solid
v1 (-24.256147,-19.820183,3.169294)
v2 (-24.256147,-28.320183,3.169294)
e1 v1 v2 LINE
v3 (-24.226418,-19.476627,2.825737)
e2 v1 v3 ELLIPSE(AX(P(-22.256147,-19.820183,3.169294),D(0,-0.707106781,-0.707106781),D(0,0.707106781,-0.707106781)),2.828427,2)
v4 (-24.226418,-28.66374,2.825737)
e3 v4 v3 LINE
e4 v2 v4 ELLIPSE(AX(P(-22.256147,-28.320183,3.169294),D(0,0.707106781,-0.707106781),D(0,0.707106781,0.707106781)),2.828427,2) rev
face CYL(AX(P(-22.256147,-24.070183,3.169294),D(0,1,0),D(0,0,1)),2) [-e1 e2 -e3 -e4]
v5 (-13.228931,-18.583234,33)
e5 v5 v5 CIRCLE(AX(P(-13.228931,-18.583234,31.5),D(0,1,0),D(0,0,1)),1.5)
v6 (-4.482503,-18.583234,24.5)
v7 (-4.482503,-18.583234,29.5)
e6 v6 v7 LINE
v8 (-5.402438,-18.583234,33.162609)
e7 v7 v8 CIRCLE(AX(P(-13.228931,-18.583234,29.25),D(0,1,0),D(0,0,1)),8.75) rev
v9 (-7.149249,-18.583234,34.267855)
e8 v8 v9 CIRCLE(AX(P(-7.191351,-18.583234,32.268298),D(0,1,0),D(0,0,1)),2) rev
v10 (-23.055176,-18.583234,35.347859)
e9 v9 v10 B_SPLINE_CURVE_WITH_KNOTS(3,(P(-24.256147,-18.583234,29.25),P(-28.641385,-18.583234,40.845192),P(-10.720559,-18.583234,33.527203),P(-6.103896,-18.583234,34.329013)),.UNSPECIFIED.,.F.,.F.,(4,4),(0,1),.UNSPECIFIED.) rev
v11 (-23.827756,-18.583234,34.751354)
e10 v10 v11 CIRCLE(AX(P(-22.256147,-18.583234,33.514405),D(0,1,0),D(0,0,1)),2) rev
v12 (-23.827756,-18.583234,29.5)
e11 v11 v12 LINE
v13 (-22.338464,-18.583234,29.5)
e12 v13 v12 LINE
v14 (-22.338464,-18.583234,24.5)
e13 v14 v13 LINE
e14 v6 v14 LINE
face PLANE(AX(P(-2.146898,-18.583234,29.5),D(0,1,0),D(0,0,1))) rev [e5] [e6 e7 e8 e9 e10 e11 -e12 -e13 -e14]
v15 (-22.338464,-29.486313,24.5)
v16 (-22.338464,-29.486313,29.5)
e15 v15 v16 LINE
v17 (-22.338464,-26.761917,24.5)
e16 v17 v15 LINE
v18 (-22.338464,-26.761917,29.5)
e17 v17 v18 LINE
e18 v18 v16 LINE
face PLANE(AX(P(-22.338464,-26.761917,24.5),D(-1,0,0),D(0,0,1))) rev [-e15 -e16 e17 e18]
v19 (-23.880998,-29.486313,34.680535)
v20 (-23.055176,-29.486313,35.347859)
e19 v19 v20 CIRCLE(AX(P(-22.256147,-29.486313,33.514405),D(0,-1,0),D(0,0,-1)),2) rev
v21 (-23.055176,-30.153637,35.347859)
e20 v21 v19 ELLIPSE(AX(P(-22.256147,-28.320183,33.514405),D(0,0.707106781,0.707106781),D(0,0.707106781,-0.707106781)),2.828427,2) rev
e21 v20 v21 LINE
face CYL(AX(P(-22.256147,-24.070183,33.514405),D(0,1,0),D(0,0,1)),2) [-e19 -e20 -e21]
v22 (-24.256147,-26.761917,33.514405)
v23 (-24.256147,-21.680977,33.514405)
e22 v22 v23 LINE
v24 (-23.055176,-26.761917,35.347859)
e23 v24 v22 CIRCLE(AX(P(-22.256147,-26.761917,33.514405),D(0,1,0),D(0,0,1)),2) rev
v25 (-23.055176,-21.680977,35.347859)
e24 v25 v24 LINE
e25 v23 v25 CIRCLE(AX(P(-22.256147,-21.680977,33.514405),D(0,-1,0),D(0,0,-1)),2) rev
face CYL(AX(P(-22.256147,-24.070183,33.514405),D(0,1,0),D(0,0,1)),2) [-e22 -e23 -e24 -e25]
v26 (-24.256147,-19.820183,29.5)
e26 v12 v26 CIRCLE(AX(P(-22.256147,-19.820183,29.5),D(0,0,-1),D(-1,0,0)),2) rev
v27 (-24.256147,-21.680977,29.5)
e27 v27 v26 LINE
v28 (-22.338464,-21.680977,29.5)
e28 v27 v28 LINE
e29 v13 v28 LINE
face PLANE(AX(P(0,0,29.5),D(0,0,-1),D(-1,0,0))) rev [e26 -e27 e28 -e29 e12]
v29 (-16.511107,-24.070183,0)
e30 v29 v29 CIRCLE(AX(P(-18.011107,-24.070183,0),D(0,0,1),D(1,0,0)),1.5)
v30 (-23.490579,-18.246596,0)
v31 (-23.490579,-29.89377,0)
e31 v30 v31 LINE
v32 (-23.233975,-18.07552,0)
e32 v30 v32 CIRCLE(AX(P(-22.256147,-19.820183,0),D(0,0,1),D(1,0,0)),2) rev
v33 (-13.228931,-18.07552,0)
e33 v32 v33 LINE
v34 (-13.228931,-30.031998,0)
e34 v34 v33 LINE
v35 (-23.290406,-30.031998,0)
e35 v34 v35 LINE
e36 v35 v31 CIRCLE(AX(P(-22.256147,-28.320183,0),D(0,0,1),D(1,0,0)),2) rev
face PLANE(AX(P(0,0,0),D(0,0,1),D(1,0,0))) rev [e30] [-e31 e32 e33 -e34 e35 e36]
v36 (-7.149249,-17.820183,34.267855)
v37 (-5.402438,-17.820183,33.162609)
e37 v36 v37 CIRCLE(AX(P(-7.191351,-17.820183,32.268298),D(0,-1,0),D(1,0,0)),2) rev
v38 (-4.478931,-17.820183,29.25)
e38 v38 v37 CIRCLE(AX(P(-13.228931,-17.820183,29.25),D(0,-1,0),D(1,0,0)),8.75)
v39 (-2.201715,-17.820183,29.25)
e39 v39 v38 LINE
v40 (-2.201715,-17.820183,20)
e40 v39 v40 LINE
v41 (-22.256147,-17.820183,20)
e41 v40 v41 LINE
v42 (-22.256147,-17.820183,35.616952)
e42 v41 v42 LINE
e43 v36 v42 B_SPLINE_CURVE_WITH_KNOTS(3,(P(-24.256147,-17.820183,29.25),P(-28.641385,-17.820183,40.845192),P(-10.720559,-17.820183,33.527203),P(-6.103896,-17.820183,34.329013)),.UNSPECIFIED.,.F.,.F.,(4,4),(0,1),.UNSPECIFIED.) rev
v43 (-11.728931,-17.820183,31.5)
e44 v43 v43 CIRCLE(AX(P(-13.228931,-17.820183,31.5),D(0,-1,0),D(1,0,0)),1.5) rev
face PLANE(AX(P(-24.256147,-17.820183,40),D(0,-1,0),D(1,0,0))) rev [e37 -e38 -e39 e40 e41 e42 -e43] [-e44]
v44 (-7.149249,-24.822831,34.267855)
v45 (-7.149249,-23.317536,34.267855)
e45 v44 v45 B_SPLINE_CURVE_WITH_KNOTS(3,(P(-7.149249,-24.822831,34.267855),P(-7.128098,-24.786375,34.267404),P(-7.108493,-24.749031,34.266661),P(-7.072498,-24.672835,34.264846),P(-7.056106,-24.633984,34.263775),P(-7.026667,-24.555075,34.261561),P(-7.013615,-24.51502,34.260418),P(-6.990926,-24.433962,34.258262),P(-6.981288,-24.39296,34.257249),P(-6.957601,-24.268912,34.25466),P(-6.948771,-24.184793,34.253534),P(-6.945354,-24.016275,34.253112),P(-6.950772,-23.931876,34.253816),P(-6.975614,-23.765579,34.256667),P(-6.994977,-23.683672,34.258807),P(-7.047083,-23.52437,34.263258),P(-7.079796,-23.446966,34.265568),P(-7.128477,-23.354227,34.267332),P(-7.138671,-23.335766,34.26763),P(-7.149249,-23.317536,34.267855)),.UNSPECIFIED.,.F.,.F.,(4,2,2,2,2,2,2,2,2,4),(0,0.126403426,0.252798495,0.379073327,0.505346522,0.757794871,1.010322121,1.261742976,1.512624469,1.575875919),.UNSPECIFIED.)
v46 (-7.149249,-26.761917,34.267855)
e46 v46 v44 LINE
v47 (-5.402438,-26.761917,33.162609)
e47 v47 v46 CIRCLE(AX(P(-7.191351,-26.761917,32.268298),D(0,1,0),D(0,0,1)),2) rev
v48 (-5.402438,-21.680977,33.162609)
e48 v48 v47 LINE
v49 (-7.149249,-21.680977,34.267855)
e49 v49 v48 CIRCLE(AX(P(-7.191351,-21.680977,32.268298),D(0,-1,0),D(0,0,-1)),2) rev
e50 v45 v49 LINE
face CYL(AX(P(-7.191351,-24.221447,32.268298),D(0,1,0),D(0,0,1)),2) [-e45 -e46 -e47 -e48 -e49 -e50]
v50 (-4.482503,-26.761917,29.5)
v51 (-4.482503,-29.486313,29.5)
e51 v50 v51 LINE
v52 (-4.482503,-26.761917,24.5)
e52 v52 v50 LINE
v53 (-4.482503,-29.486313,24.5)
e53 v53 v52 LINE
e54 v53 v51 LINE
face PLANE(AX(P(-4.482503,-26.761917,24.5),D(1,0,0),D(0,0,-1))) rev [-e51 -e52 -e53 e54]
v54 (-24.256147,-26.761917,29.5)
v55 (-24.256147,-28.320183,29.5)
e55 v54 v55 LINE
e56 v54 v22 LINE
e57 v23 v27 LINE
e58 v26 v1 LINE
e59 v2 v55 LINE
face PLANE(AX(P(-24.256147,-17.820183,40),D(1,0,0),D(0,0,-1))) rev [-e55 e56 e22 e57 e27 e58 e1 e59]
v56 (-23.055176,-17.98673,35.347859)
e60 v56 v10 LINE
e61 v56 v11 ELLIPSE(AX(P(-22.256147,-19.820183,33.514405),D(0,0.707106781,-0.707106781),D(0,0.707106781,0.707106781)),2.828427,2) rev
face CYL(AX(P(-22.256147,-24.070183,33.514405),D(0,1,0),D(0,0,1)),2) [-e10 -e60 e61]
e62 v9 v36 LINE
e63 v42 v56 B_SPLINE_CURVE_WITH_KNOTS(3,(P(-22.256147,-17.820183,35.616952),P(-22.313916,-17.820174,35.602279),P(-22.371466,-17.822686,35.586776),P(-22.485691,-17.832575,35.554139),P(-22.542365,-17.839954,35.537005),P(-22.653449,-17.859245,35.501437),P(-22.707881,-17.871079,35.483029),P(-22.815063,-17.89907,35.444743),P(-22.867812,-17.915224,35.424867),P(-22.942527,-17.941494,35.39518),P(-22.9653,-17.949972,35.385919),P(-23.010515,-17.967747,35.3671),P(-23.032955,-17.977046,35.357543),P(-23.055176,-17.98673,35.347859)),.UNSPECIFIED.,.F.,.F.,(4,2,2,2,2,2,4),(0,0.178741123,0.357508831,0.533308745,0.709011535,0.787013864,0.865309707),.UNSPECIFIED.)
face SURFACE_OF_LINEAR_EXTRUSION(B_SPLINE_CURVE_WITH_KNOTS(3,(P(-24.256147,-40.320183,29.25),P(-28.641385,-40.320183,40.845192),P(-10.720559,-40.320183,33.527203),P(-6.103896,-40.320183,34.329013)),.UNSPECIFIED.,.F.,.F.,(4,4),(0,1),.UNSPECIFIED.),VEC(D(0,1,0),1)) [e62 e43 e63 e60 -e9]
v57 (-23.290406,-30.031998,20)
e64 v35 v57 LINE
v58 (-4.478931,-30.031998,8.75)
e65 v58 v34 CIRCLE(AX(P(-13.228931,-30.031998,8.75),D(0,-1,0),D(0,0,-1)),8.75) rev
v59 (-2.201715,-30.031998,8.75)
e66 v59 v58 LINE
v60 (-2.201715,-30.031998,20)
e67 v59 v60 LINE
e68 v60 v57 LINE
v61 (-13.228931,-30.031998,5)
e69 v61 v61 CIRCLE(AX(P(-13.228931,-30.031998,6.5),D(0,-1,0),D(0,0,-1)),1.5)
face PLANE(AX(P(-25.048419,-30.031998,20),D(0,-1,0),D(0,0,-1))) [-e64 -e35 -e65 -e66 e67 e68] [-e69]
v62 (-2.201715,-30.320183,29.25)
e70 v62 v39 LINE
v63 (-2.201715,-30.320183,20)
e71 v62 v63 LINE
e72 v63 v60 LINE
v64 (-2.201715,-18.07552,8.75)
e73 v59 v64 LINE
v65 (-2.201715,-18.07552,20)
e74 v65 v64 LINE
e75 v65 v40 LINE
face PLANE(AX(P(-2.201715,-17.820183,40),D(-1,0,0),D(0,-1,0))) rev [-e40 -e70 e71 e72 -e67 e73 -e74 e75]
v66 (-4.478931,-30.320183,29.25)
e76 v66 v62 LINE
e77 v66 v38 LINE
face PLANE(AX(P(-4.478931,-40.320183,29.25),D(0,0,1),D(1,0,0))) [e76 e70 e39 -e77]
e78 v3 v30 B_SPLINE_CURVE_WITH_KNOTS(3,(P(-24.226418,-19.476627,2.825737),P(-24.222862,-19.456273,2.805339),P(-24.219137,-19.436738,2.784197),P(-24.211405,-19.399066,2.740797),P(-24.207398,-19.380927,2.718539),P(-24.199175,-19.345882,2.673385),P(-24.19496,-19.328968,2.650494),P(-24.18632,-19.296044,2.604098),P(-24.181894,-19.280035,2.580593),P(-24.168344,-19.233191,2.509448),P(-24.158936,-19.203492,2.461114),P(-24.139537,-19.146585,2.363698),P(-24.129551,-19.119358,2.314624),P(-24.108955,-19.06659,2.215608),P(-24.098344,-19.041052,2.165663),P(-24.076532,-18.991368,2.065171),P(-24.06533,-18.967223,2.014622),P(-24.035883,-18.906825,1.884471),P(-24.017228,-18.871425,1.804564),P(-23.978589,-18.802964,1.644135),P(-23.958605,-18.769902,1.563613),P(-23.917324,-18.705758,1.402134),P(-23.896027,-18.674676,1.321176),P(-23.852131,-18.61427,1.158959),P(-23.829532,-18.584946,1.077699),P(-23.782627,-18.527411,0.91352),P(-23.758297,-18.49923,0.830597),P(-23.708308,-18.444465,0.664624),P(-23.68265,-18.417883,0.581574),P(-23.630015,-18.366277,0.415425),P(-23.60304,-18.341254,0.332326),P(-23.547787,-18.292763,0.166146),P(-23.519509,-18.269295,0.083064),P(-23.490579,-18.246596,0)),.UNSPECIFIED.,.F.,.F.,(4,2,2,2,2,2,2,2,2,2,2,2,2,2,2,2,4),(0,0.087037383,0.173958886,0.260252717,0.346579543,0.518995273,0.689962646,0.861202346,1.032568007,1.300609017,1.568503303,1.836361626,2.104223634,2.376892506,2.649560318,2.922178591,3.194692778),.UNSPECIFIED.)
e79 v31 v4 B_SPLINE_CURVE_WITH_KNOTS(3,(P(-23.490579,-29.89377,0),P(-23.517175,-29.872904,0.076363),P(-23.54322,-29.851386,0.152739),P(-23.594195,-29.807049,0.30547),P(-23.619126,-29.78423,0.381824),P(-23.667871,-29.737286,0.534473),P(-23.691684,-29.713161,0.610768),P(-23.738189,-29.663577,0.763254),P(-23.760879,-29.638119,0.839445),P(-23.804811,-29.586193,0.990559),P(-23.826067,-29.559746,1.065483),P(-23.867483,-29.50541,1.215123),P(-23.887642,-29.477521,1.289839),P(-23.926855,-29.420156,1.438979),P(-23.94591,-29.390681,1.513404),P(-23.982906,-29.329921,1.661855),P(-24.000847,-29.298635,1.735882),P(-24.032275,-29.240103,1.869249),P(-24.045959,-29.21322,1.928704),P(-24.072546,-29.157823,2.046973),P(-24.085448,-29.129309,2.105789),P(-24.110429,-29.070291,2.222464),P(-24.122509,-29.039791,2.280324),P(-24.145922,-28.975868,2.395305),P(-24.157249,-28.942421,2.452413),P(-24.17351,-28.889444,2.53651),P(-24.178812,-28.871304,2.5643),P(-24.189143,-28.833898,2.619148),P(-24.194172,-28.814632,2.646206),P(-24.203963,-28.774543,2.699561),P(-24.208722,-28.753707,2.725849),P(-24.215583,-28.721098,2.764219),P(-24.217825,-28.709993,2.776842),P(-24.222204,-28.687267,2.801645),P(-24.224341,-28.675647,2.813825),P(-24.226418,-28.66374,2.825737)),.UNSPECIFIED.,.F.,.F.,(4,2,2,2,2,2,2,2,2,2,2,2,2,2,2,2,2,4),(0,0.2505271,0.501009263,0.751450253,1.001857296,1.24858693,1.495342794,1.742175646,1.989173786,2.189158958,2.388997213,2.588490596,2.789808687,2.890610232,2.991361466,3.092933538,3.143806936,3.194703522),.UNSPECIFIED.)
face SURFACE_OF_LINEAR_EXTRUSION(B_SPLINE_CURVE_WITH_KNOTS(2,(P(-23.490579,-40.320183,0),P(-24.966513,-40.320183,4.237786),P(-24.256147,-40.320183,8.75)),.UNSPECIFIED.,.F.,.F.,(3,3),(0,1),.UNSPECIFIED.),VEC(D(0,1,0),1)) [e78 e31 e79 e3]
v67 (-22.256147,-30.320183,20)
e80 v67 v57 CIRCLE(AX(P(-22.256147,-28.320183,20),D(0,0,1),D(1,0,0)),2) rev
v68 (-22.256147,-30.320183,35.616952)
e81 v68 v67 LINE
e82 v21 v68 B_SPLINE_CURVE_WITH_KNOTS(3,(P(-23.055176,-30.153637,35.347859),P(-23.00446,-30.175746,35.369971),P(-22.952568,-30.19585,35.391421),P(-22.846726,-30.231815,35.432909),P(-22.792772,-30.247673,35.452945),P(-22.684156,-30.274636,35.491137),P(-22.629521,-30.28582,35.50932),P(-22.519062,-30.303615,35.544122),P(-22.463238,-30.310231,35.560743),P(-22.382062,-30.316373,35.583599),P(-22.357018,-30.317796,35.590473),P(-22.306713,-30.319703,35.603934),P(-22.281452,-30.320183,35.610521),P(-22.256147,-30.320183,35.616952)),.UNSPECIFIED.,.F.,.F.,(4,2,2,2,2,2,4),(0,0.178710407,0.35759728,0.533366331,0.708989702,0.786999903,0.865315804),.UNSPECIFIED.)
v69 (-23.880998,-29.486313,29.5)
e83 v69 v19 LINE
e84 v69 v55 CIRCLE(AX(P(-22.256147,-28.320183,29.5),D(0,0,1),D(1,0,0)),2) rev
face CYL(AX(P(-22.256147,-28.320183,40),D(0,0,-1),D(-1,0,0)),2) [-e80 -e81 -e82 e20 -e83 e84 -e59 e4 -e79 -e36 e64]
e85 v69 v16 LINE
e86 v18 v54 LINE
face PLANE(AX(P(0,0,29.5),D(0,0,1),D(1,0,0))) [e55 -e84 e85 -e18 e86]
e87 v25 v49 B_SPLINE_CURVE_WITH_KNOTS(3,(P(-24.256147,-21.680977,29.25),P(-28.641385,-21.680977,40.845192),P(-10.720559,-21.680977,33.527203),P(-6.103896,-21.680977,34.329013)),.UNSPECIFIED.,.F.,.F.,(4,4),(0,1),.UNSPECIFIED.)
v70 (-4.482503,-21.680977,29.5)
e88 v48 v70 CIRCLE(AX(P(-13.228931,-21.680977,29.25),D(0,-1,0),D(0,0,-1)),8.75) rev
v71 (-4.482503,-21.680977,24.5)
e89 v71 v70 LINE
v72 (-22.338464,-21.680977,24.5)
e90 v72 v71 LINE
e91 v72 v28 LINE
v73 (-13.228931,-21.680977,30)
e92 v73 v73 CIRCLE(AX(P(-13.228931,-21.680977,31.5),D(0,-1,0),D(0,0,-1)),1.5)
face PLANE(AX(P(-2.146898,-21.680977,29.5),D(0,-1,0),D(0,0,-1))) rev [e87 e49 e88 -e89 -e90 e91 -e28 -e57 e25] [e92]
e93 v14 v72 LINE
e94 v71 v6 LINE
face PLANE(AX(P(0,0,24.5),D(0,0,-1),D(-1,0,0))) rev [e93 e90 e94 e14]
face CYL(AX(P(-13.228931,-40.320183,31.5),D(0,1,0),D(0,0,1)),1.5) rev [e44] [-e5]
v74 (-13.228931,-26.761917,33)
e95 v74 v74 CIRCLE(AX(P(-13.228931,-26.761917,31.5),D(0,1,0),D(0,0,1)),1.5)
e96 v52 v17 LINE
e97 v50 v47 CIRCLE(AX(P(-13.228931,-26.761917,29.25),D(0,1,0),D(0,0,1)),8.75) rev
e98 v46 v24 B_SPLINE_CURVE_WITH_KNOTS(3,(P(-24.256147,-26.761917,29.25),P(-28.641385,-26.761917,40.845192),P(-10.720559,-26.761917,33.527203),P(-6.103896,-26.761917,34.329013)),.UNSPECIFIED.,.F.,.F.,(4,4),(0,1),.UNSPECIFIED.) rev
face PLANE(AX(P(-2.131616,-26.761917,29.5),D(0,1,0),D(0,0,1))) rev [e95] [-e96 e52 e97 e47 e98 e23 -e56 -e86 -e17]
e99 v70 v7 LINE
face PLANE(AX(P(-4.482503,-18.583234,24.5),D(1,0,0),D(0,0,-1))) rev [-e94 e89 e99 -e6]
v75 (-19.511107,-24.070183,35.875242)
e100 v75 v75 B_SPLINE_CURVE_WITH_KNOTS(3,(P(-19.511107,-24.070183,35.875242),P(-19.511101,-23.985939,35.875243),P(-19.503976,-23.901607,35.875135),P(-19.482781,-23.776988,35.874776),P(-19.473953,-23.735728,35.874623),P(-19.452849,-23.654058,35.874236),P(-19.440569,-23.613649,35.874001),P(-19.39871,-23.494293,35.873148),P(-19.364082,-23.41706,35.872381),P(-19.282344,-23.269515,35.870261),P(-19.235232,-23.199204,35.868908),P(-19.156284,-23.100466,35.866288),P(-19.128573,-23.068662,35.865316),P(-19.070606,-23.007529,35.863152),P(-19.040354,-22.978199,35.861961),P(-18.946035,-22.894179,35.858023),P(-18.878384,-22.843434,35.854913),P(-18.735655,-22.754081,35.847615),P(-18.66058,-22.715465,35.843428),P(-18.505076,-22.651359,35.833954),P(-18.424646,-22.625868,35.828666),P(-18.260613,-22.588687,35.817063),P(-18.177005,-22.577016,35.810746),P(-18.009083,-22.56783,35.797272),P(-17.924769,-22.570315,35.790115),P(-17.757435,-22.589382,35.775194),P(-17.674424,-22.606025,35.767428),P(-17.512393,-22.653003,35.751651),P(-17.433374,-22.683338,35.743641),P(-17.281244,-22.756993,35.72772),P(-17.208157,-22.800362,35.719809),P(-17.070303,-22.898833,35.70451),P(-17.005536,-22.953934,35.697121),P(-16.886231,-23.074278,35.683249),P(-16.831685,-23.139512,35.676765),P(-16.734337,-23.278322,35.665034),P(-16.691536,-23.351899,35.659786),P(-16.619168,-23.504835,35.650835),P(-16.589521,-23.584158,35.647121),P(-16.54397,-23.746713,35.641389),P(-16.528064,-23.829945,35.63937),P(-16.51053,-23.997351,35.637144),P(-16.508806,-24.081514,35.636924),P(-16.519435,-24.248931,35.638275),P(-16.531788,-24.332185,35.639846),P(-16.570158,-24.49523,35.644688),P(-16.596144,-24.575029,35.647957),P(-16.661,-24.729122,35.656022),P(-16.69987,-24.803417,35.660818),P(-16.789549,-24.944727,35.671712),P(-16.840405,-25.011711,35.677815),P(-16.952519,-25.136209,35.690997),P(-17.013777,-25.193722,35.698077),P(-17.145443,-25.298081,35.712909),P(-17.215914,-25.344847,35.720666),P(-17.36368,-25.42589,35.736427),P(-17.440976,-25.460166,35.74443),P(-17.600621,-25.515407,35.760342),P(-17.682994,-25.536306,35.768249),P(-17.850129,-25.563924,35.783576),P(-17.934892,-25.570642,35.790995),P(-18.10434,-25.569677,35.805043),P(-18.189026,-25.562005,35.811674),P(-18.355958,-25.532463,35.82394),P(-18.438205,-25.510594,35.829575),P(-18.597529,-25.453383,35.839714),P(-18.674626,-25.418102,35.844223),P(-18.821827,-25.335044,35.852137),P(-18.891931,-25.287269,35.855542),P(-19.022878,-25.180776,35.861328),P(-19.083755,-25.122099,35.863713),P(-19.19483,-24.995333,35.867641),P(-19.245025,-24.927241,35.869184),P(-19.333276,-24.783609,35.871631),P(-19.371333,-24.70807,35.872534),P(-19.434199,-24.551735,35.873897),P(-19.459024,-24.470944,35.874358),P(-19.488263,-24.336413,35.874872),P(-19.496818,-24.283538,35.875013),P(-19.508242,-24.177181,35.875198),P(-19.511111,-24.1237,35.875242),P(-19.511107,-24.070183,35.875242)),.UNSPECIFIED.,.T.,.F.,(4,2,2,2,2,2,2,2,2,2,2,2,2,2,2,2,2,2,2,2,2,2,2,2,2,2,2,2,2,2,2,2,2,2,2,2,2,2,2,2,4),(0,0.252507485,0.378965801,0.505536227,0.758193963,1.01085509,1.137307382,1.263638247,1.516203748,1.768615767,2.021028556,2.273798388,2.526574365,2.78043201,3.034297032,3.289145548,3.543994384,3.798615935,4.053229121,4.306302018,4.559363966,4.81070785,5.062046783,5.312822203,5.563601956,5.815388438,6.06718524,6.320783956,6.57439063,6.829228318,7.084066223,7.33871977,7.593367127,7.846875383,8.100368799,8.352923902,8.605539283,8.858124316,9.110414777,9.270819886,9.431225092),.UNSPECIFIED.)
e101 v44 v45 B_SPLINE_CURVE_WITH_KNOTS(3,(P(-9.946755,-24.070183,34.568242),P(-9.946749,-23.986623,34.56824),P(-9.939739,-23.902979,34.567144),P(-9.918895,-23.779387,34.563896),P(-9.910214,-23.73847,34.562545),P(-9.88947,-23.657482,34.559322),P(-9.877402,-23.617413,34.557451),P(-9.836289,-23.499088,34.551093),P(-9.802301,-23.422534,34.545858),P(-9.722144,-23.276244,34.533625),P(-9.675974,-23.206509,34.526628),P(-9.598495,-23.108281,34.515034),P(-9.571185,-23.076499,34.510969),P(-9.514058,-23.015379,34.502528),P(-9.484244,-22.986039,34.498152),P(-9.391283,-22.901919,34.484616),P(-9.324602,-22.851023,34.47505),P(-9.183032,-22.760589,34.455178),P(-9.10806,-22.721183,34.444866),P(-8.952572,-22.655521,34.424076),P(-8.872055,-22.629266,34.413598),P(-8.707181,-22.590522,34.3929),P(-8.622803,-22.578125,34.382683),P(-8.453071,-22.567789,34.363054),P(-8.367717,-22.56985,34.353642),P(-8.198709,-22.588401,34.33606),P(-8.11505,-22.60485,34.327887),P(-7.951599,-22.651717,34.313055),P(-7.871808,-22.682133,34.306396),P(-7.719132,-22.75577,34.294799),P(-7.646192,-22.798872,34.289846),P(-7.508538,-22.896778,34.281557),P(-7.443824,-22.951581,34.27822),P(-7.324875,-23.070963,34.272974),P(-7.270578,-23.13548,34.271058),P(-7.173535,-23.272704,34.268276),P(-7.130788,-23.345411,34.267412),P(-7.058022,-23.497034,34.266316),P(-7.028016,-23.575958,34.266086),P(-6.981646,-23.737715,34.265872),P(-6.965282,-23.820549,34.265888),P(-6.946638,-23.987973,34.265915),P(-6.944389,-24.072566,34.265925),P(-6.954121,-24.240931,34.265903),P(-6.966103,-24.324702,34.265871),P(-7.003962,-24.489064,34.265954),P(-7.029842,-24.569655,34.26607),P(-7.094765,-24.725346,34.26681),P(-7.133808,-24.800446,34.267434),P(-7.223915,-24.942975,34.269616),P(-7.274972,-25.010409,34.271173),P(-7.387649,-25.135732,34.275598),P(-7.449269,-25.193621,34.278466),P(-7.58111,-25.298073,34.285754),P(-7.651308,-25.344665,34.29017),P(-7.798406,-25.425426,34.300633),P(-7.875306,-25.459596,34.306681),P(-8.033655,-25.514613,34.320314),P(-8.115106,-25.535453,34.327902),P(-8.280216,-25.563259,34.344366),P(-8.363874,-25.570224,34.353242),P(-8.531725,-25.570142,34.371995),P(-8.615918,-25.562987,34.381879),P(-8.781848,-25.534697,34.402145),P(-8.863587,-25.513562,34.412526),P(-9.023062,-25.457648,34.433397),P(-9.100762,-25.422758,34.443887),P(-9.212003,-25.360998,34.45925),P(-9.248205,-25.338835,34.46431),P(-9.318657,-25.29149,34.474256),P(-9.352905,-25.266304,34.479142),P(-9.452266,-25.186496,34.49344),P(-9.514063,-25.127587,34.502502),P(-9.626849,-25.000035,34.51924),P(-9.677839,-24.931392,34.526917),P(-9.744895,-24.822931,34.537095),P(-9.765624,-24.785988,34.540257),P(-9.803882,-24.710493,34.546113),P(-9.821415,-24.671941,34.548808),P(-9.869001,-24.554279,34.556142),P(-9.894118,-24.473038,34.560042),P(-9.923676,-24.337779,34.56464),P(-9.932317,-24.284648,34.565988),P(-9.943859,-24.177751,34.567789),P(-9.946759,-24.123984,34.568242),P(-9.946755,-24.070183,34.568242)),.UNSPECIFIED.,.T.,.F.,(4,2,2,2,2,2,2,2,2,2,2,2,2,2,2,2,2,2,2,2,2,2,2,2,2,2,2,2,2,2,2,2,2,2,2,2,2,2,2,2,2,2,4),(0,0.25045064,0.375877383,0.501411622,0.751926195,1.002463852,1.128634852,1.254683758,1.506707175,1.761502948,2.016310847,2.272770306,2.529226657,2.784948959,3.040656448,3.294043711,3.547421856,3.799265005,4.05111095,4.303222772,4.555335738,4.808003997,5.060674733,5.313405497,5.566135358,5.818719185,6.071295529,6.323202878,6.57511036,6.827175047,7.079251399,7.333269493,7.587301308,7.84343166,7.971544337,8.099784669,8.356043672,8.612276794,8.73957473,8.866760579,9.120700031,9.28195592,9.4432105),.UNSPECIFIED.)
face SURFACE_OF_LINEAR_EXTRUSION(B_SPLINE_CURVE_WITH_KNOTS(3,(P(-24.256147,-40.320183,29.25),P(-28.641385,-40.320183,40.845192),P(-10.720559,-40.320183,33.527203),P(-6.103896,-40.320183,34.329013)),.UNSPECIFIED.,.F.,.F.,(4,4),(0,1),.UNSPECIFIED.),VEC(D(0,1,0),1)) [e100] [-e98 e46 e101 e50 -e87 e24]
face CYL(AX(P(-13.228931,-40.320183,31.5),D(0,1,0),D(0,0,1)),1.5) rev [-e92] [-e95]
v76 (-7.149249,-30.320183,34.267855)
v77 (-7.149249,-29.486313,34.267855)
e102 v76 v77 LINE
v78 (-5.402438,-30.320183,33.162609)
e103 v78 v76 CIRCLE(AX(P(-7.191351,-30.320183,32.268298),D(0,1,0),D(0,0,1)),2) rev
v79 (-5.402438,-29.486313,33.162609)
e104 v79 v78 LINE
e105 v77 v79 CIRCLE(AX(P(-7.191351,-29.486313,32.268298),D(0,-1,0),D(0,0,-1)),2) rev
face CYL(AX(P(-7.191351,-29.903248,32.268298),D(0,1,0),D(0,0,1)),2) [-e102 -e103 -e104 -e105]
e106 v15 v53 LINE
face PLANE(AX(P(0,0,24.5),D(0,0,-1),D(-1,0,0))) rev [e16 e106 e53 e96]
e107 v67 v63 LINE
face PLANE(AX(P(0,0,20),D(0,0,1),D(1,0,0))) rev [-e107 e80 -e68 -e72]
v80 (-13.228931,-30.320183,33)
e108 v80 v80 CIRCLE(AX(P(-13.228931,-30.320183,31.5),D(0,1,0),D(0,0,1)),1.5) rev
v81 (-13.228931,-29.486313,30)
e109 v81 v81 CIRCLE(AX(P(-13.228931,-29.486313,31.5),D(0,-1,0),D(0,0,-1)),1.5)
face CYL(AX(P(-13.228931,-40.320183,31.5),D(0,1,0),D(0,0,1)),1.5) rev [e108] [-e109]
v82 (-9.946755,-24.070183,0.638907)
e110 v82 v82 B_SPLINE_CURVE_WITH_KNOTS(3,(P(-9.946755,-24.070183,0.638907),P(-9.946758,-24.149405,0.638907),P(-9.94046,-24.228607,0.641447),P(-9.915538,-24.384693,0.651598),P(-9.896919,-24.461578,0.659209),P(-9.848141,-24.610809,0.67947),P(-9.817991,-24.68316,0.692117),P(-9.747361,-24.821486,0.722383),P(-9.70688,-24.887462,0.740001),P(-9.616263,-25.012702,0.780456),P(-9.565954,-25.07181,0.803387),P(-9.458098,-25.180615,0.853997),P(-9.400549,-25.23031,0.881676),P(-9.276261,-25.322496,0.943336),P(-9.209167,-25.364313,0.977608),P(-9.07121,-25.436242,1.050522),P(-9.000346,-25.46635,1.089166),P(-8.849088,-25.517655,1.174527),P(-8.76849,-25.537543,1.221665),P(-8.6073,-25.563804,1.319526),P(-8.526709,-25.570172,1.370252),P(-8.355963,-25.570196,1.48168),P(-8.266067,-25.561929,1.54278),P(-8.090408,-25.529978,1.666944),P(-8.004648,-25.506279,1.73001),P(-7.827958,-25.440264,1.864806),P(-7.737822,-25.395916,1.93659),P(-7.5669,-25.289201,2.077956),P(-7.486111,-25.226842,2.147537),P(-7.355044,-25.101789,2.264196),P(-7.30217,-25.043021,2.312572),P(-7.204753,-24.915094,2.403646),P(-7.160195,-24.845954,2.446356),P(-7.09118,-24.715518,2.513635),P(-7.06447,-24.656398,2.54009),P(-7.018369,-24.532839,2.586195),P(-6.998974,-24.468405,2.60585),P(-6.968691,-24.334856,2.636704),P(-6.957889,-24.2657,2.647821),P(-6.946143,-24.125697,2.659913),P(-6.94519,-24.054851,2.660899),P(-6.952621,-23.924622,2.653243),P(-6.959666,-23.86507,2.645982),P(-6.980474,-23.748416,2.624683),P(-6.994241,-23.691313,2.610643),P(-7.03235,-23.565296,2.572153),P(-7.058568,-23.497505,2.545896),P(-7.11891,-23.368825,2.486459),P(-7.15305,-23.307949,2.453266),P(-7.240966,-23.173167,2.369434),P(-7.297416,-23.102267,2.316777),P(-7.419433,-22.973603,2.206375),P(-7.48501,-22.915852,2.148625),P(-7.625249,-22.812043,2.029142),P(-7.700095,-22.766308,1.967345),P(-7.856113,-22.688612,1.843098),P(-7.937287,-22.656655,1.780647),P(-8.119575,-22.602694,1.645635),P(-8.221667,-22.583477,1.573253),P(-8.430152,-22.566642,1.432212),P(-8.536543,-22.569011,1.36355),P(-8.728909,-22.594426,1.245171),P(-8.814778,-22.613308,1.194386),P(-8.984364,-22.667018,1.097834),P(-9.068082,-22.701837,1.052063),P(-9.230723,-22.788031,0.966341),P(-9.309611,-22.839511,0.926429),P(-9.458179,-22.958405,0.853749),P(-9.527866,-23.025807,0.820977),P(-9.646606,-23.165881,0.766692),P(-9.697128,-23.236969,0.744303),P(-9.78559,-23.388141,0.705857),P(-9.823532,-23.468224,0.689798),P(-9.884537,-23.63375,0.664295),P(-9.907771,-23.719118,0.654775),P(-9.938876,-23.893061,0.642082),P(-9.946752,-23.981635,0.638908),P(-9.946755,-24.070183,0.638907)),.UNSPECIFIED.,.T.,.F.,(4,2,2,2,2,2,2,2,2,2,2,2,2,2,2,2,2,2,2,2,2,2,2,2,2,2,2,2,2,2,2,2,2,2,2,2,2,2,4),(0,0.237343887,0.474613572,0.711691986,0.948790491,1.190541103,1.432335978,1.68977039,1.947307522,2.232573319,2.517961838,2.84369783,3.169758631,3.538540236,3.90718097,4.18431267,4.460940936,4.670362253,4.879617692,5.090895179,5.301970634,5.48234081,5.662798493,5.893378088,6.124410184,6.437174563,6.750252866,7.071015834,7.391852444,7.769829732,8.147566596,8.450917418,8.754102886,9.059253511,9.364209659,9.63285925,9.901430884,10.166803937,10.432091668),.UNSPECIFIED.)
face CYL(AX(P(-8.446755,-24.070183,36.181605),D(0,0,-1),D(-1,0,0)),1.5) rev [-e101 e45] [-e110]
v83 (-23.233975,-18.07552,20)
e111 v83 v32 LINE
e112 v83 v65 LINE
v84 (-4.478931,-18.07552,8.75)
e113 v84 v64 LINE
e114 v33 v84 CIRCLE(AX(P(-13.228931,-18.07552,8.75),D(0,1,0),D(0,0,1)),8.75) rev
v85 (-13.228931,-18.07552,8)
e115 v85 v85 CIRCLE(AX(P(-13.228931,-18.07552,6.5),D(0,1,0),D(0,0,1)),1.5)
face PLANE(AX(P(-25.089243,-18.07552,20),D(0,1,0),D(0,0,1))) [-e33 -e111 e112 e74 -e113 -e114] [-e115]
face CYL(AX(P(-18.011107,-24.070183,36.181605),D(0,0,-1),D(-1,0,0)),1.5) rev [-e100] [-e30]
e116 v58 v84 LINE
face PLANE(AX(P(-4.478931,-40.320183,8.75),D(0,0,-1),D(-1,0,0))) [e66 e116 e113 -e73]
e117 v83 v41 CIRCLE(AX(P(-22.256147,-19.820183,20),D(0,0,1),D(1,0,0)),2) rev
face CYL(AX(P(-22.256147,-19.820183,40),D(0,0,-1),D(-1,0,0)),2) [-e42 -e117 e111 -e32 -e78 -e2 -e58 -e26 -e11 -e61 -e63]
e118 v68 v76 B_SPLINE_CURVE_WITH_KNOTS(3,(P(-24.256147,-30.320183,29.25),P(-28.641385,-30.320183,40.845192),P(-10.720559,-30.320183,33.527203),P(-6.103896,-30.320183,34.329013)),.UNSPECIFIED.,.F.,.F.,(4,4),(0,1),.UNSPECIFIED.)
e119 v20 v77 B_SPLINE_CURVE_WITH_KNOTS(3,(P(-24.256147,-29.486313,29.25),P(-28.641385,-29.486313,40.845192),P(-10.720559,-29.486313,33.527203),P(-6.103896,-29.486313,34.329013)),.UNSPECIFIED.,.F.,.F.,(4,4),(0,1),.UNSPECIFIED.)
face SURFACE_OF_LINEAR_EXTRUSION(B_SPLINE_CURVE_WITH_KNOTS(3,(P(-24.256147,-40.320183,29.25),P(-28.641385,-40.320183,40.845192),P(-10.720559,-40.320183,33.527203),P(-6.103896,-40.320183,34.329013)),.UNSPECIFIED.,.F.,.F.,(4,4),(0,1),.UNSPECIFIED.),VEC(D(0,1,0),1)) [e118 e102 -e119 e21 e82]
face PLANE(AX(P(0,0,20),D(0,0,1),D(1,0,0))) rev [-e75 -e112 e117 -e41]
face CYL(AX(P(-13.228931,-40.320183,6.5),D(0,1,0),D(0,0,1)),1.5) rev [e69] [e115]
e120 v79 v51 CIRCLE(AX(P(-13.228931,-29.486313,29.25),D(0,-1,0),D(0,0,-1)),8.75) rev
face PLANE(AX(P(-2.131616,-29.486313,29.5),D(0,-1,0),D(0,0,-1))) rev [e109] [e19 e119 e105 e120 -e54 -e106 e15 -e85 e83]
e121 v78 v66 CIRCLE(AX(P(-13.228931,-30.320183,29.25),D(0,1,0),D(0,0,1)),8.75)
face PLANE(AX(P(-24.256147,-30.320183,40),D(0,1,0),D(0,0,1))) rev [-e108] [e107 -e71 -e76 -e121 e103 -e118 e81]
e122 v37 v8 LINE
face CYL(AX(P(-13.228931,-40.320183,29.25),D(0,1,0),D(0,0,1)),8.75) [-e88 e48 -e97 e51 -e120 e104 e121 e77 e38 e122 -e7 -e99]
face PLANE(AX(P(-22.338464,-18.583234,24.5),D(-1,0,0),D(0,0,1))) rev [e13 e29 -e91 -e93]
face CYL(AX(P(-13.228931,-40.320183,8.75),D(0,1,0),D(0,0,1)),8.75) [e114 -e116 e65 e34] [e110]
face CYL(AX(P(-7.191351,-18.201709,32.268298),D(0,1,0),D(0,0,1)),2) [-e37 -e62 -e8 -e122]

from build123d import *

# Parameters (mm, degrees)
SKETCH1_W               = 22.054431489
SKETCH1_H               = 12.5
BOSS_EXTRUDE1_DEPTH     = 40
CUT_EXTRUDE1_DEPTH      = 10
CUT_EXTRUDE1_DEPTH_BACK = 15
SKETCH2_R               = 1.5
FILLET3_R               = 2
SKETCH5_R               = 1.5
CUT_EXTRUDE4_DEPTH      = 53.86644408
SKETCH16_W              = 22.16406654
SKETCH16_H              = 3.097743049
SKETCH16_W_2            = 22.194630718
SKETCH16_H_2            = 2.724396189
CUT_EXTRUDE6_DEPTH      = 8.5
FILLET4_R               = 2
SKETCH17_W              = 17.85596127
SKETCH17_H              = 3.097743049
SKETCH17_H_2            = 2.724396189
CUT_EXTRUDE7_DEPTH      = 5
SKETCH18_W              = 23.758682738
SKETCH18_H              = 0.759330362
SKETCH18_W_2            = 23.717859304
SKETCH18_H_2            = 0.728261761
CUT_EXTRUDE8_DEPTH      = 20


with BuildPart() as part:
    # Sketch1 → Boss-Extrude1 (new body)
    with BuildSketch(Plane.XY):
        with Locations((-13.228930986, -24.070183414)):
            Rectangle(SKETCH1_W, SKETCH1_H)
    extrude(amount=BOSS_EXTRUDE1_DEPTH)

    # Sketch2 → Cut-Extrude1 (cut, two sides: drawn at the far end of the back side and taken through both)
    with BuildSketch(Plane.XZ.offset(30.320183414).offset(-CUT_EXTRUDE1_DEPTH_BACK)):
        with Locations(Location((-13.228930986, 6.5, 0), (0, 0, 90))):
            Circle(SKETCH2_R)
        with Locations(Location((-13.228930986, 31.5, 0), (0, 0, 90))):
            Circle(SKETCH2_R)
        with BuildLine():
            Line((-4.478930986, 29.25), (-2.201715242, 29.25))
            add(Edge.make_bspline(
                [(-24.256146731, 29.25), (-34.277912729, 38.417119108), (-13.227499763, 50.308047167), (7.840407292, 38.416977249), (-2.201715242, 29.25)],
                knots=[0, 0, 0, 0, 0.49986218, 1, 1, 1, 1], degree=3))
            add(Edge.make_bspline(
                [(-6.103895584, 34.329012749), (-10.720559386, 33.527203043), (-28.641384523, 40.845191705), (-24.256146731, 29.25)],
                knots=[0, 0, 0, 0, 1, 1, 1, 1], degree=3))
            ThreePointArc((-6.103895584, 34.329012749), (-4.895067543, 31.916312081), (-4.478930986, 29.25))
        make_face()
        with BuildLine():
            Line((-4.478930986, 8.75), (-2.201715242, 8.75))
            add(Edge.make_bspline(
                [(-2.201715242, 8.75), (5.39210746, 3.880294823), (-0.777052631, -4.523329032), (-17.174300591, -10.623347238), (-34.821400648, -0.026005424), (-24.256146731, 8.75)],
                knots=[0, 0, 0, 0, 0.283272691, 0.504244858, 1, 1, 1, 1], degree=3))
            add(Edge.make_bspline(
                [(-23.490579314, 0), (-24.966512963, 4.237786421), (-24.256146731, 8.75)],
                knots=[0, 0, 0, 1, 1, 1], degree=2))
            Line((-23.490579314, 0), (-13.228930986, 0))
            ThreePointArc((-13.228930986, 0), (-7.041746651, 2.562815665), (-4.478930986, 8.75))
        make_face()
    extrude(amount=CUT_EXTRUDE1_DEPTH + CUT_EXTRUDE1_DEPTH_BACK, mode=Mode.SUBTRACT)

    # Fillet3
    # the kernel refuses this fillet: 2 mm, written as the material it takes off along each edge
    with BuildSketch(Plane(origin=(-24.256146731, -17.820183414, -5.498495188), x_dir=(1, 0, 0), z_dir=(0, 0, 1))) as fillet3_piece_1:
        with BuildLine():
            CenterArc((FILLET3_R, -FILLET3_R), FILLET3_R, 90, 90)
            Line((0, -FILLET3_R), (-FILLET3_R * 0.02, -FILLET3_R))
            Line((-FILLET3_R * 0.02, -FILLET3_R), (-FILLET3_R * 0.02, FILLET3_R * 0.02))
            Line((-FILLET3_R * 0.02, FILLET3_R * 0.02), (FILLET3_R, FILLET3_R * 0.02))
            Line((FILLET3_R, FILLET3_R * 0.02), (FILLET3_R, 0))
        make_face()
    extrude(amount=44.984872581, mode=Mode.SUBTRACT)
    with BuildSketch(Plane(origin=(-24.256146731, -30.320183414, -5.498495188), x_dir=(1, 0, 0), z_dir=(0, 0, 1))) as fillet3_piece_2:
        with BuildLine():
            CenterArc((FILLET3_R, FILLET3_R), FILLET3_R, 180, 90)
            Line((0, FILLET3_R), (-FILLET3_R * 0.02, FILLET3_R))
            Line((-FILLET3_R * 0.02, FILLET3_R), (-FILLET3_R * 0.02, -FILLET3_R * 0.02))
            Line((-FILLET3_R * 0.02, -FILLET3_R * 0.02), (FILLET3_R, -FILLET3_R * 0.02))
            Line((FILLET3_R, -FILLET3_R * 0.02), (FILLET3_R, 0))
        make_face()
    extrude(amount=44.984872581, mode=Mode.SUBTRACT)
    with BuildSketch(Plane(origin=(-24.256146731, -17.374523396, 3.001504812), x_dir=(0.16676818592575848, -1.2260366807919533e-15, -0.9859961319209278), z_dir=(0, -1, 0))) as fillet3_piece_3:
        with BuildLine():
            CenterArc((0.168096911, 1.999974157), FILLET3_R, 260.400032587, 9.891234523)
            Line((-0.165439461, 0.027981894), (-0.172110188, -0.011457952))
            Line((-0.172110188, -0.011457952), (-0.006670727, -0.039439845))
            Line((-0.006670727, -0.039439845), (-0.00020343, -0.039999483))
            ThreePointArc((-0.00020343, -0.039999483), (0.089132026, -0.040226606), (0.178467349, -0.039999483))
            Line((0.178467349, -0.039999483), (0.178264007, 0))
        make_face()
    extrude(amount=13.391320036, mode=Mode.SUBTRACT)
    with BuildSketch(Plane(origin=(-24.256146731, -14.125185169, 34.486377393), x_dir=(0.8125654725304995, 0, 0.5828699279009736), z_dir=(0, -1, 0))) as fillet3_piece_4:
        with BuildLine():
            CenterArc((1.058597408, -1.955531144), FILLET3_R, 77.895172565, 66.452175148)
            Line((-0.566533537, -0.789791288), (-0.599036156, -0.766476491))
            Line((-0.599036156, -0.766476491), (-0.032502619, 0.023314797))
            Line((-0.032502619, 0.023314797), (-0.009827922, 0.038773856))
            ThreePointArc((-0.009827922, 0.038773856), (0.740246051, 0.125750941), (1.486387336, 0.039110623))
            Line((1.486387336, 0.039110623), (1.477999298, 0))
        make_face()
    extrude(amount=19.88999649, mode=Mode.SUBTRACT)

    # Sketch5 → Cut-Extrude4 (cut, through all)
    with BuildSketch(Plane.XY):
        with Locations(Location((-18.011106811, -24.070183414, 0), (0, 0, 180))):
            Circle(SKETCH5_R)
        with Locations(Location((-8.446755162, -24.070183414, 0), (0, 0, 180))):
            Circle(SKETCH5_R)
    extrude(amount=CUT_EXTRUDE4_DEPTH, mode=Mode.SUBTRACT)

    # Sketch16 → Cut-Extrude6 (cut)
    with BuildSketch(Plane.XY.offset(38)):
        with Locations((-13.228930985, -20.132105575)):
            Rectangle(SKETCH16_W, SKETCH16_H)
        with Locations((-13.228930985, -28.124114993)):
            Rectangle(SKETCH16_W_2, SKETCH16_H_2)
    extrude(amount=-CUT_EXTRUDE6_DEPTH, mode=Mode.SUBTRACT)

    # Fillet4
    # the kernel refuses this fillet: 2 mm, written as the material it takes off along each edge
    with BuildSketch(Plane(origin=(-6.103895584, -21.985936801, 34.329012749), x_dir=(0.5153680546007453, 0, -0.8569689424343471), z_dir=(0, 1, 0))) as fillet4_piece_1:
        with BuildLine():
            CenterArc((1.205528974, 1.993941708), FILLET4_R, 212.228268917, 62.232476225)
            Line((-0.486331325, 0.927354287), (-0.520168531, 0.906022538))
            ThreePointArc((-0.520168531, 0.906022538), (-0.25689069, 0.456334761), (-0.037300681, -0.01444504))
            Line((-0.037300681, -0.01444504), (-0.003111043, -0.039878834))
            ThreePointArc((-0.003111043, -0.039878834), (0.68054055, -0.066505026), (1.364192143, -0.039878834))
            Line((1.364192143, -0.039878834), (1.3610811, 0))
        make_face()
    extrude(amount=7.568456138, mode=Mode.SUBTRACT)
    with BuildSketch(Plane(origin=(-6.103895584, -30.164619649, 34.329012749), x_dir=(0.5153680546007453, 0, -0.8569689424343471), z_dir=(0, 1, 0))) as fillet4_piece_2:
        with BuildLine():
            CenterArc((1.205528974, 1.993941708), FILLET4_R, 212.228268917, 62.232476225)
            Line((-0.486331325, 0.927354287), (-0.520168531, 0.906022538))
            ThreePointArc((-0.520168531, 0.906022538), (-0.25689069, 0.456334761), (-0.037300681, -0.01444504))
            Line((-0.037300681, -0.01444504), (-0.003111043, -0.039878834))
            ThreePointArc((-0.003111043, -0.039878834), (0.68054055, -0.066505026), (1.364192143, -0.039878834))
            Line((1.364192143, -0.039878834), (1.3610811, 0))
        make_face()
    extrude(amount=11.886345299, mode=Mode.SUBTRACT)
    with BuildSketch(Plane(origin=(-6.103895584, -33.722886164, 34.329012749), x_dir=(0.5153680546007453, 0, -0.8569689424343471), z_dir=(0, 1, 0))) as fillet4_piece_3:
        with BuildLine():
            CenterArc((1.205528974, 1.993941708), FILLET4_R, 212.228268917, 62.232476225)
            Line((-0.486331325, 0.927354287), (-0.520168531, 0.906022538))
            ThreePointArc((-0.520168531, 0.906022538), (-0.25689069, 0.456334761), (-0.037300681, -0.01444504))
            Line((-0.037300681, -0.01444504), (-0.003111043, -0.039878834))
            ThreePointArc((-0.003111043, -0.039878834), (0.68054055, -0.066505026), (1.364192143, -0.039878834))
            Line((1.364192143, -0.039878834), (1.3610811, 0))
        make_face()
    extrude(amount=7.639275828, mode=Mode.SUBTRACT)

    # Sketch17 → Cut-Extrude7 (cut)
    with BuildSketch(Plane.XY.offset(29.5)):
        with Locations((-13.410483779, -20.132105575)):
            Rectangle(SKETCH17_W, SKETCH17_H)
        with Locations((-13.410483779, -28.124114993)):
            Rectangle(SKETCH17_W, SKETCH17_H_2)
    extrude(amount=-CUT_EXTRUDE7_DEPTH, mode=Mode.SUBTRACT)

    # Sketch18 → Cut-Extrude8 (cut)
    with BuildSketch(Plane.XY):
        with Locations((-13.209901434, -17.695854471)):
            Rectangle(SKETCH18_W, SKETCH18_H)
        with Locations((-13.189489717, -30.396128596)):
            Rectangle(SKETCH18_W_2, SKETCH18_H_2)
    extrude(amount=CUT_EXTRUDE8_DEPTH, mode=Mode.SUBTRACT)


solid = part.part
